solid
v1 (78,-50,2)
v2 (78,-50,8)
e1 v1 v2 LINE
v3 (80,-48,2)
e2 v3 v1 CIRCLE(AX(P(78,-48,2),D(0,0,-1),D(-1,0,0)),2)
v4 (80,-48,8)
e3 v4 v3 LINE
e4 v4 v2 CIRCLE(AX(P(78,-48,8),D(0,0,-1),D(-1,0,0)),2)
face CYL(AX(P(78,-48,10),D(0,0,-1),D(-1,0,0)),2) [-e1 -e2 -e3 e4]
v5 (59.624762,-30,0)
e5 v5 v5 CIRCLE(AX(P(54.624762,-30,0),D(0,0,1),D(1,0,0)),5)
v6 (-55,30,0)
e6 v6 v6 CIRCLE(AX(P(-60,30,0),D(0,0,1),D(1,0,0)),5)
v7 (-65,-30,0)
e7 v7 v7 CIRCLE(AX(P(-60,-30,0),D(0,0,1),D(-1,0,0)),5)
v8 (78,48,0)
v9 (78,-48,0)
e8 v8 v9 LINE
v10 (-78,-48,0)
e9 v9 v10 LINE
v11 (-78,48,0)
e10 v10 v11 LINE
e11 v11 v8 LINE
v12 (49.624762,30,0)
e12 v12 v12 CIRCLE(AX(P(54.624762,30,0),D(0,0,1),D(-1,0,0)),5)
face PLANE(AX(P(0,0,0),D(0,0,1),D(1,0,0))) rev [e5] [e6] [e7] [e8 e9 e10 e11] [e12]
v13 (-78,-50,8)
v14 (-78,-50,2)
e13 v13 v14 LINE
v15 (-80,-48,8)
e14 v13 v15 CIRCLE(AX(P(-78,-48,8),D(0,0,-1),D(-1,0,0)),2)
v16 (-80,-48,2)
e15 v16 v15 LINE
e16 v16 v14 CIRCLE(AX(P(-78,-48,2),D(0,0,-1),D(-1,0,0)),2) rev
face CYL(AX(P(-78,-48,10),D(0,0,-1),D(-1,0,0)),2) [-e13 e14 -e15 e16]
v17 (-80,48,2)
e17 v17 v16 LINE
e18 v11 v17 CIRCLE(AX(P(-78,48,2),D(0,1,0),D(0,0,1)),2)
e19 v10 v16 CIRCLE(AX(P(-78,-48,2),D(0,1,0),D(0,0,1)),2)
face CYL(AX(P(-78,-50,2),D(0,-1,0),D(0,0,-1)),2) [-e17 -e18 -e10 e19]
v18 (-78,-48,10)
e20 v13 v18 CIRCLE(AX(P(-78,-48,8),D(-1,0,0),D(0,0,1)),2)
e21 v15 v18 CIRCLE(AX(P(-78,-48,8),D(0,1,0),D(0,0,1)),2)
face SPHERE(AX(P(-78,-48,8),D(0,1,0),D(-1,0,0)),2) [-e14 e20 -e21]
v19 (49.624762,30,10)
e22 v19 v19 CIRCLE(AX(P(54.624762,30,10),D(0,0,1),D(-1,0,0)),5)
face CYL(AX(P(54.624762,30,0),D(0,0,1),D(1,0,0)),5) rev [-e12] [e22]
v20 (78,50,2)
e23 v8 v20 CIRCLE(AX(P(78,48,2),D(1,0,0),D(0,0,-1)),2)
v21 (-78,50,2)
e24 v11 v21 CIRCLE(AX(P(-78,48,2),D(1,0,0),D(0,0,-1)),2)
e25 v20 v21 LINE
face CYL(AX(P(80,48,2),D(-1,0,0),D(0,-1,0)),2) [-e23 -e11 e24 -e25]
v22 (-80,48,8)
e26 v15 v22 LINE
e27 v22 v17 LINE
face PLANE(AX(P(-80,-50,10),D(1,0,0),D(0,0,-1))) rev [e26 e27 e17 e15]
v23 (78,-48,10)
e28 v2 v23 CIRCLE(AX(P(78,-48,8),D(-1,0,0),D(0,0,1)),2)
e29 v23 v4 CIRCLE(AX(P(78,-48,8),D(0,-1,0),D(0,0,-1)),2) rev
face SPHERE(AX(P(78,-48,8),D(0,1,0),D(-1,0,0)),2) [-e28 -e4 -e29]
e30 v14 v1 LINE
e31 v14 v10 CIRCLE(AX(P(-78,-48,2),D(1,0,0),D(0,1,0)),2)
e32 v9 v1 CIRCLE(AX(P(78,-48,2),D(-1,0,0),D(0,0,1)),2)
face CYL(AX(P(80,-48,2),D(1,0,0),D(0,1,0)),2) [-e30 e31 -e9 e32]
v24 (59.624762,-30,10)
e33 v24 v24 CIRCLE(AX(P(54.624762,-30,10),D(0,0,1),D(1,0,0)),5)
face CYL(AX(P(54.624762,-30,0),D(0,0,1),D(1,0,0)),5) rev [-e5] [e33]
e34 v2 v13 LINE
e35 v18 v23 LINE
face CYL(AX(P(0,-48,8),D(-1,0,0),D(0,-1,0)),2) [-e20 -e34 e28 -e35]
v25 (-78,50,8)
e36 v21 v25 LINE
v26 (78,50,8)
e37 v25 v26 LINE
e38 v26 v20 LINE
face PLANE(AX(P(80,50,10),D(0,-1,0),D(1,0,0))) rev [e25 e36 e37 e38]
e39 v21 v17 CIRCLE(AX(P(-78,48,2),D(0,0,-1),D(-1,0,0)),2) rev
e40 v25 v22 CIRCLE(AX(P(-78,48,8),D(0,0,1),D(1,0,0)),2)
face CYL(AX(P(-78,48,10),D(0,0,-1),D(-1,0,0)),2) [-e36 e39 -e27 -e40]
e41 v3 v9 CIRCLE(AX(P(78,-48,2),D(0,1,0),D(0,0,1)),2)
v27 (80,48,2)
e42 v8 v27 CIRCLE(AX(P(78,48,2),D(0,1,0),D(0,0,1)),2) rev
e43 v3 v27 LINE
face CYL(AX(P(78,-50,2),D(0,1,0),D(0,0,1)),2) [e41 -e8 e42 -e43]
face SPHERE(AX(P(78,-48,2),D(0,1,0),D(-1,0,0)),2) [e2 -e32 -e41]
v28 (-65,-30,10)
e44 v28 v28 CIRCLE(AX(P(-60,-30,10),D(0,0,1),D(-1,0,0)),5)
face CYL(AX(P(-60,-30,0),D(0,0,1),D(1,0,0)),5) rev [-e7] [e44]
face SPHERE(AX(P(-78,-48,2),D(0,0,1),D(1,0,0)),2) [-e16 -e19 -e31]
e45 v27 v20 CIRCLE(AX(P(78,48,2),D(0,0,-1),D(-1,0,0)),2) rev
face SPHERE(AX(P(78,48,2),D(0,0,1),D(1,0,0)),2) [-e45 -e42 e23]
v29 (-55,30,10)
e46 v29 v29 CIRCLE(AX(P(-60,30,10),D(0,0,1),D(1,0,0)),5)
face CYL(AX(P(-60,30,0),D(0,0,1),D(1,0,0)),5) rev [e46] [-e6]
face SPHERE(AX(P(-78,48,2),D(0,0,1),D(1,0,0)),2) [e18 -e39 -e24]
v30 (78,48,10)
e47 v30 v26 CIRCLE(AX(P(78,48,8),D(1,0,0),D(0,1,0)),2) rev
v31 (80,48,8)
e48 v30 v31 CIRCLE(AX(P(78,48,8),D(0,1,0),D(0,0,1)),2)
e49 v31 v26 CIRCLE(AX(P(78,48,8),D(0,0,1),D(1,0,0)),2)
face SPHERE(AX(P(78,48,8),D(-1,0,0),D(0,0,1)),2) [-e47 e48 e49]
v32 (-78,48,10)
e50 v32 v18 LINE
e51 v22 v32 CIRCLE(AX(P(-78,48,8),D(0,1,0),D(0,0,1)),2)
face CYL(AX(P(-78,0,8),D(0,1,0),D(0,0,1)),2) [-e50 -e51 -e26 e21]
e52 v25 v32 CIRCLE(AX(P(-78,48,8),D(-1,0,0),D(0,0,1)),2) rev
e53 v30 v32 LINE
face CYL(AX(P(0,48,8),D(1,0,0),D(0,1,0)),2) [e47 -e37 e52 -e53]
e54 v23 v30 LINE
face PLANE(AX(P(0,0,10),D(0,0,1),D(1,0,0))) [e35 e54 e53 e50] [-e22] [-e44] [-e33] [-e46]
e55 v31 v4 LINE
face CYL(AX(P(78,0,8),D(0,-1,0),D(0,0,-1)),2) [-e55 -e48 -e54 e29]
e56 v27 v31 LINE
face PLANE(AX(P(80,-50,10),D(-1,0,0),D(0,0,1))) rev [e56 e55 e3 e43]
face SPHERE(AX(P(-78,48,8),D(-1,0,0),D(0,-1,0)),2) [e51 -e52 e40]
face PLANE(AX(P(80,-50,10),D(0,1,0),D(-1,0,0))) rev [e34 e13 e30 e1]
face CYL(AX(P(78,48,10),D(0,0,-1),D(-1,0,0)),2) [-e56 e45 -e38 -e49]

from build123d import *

# Parameters (mm, degrees)
SKETCH1_W           = 160
SKETCH1_H           = 100
BOSS_EXTRUDE2_DEPTH = 10
SKETCH2_R           = 5
CUT_EXTRUDE1_DEPTH  = 10
FILLET3_R           = 2
FILLET4_R           = 2
FILLET5_R           = 2
FILLET6_R           = 2


with BuildPart() as part:
    # Sketch1 → Boss-Extrude2 (new body)
    with BuildSketch(Plane.XY):
        Rectangle(SKETCH1_W, SKETCH1_H)
    extrude(amount=BOSS_EXTRUDE2_DEPTH)

    # Sketch2 → Cut-Extrude1 (cut)
    with BuildSketch(Plane.XY.offset(10)):
        with Locations((-60, 30)):
            Circle(SKETCH2_R)
        with Locations(Location((54.624761616, 30, 0), (0, 0, 180))):
            Circle(SKETCH2_R)
        with Locations((54.624761616, -30)):
            Circle(SKETCH2_R)
        with Locations(Location((-60, -30, 0), (0, 0, 180))):
            Circle(SKETCH2_R)
    extrude(amount=-CUT_EXTRUDE1_DEPTH, mode=Mode.SUBTRACT)

    # Fillet3
    fillet3_edges = [part.edges().sort_by_distance(p)[0] for p in [
        (0, 50, 10),
        (-80, 0, 10),
        (-80, 50, 5),
    ]]
    fillet(fillet3_edges, radius=FILLET3_R)

    # Fillet4
    fillet4_edges = [part.edges().sort_by_distance(p)[0] for p in [
        (80, -1, 10),
        (80, 50, 4),
        (80, 49.414213562, 9.414213562),
        (80, 0, 0),
    ]]
    fillet(fillet4_edges, radius=FILLET4_R)

    # Fillet5
    fillet5_edges = [part.edges().sort_by_distance(p)[0] for p in [
        (0, -50, 10),
        (-80, -50, 4),
        (-79.414213562, -50, 9.414213562),
        (80, -50, 5),
        (79.414213562, -50, 9.414213562),
        (79.414213562, -50, 0.585786438),
        (-1, -50, 0),
    ]]
    fillet(fillet5_edges, radius=FILLET5_R)

    # Fillet6
    # the kernel refuses this fillet: 2 mm, written as the material it takes off along each edge
    with BuildSketch(Plane(origin=(78, 48, 2), x_dir=(0, 1, 0), z_dir=(0, 0, -1))) as fillet6_piece_1_section:
        Polygon((0, 0), (FILLET6_R, 0), (FILLET6_R, FILLET6_R), (0, FILLET6_R), align=None)
    fillet6_piece_1 = extrude(amount=FILLET6_R, mode=Mode.PRIVATE)
    fillet6_piece_1 = fillet6_piece_1 - Plane(origin=(78, 48, 2), x_dir=(-0.7071067811865475, -0.7071067811865476, 0), z_dir=(0, 0, -1)) * Sphere(FILLET6_R, mode=Mode.PRIVATE)
    add(fillet6_piece_1, mode=Mode.SUBTRACT)
    with BuildSketch(Plane(origin=(-78, -48, 2), x_dir=(-1, 0, 0), z_dir=(0, 0, -1))) as fillet6_piece_2_section:
        Polygon((0, 0), (FILLET6_R, 0), (FILLET6_R, -FILLET6_R), (0, -FILLET6_R), align=None)
    fillet6_piece_2 = extrude(amount=FILLET6_R, mode=Mode.PRIVATE)
    fillet6_piece_2 = fillet6_piece_2 - Plane(origin=(-78, -48, 2), x_dir=(0.7071067811865475, 0.7071067811865475, 0), z_dir=(0, 0, -1)) * Sphere(FILLET6_R, mode=Mode.PRIVATE)
    add(fillet6_piece_2, mode=Mode.SUBTRACT)
    with BuildSketch(Plane(origin=(-80, -48, 0), x_dir=(1, 0, 0), z_dir=(0, 1, 0))) as fillet6_piece_3:
        with BuildLine():
            CenterArc((FILLET6_R, -FILLET6_R), FILLET6_R, 90, 90)
            Line((0, -FILLET6_R), (0, 0))
            Line((0, 0), (FILLET6_R, 0))
        make_face()
    extrude(amount=96, mode=Mode.SUBTRACT)
    with BuildSketch(Plane(origin=(-78, 48, 0), x_dir=(-1, 0, 0), z_dir=(0, -1, 0))) as fillet6_piece_4:
        with BuildLine():
            CenterArc((2 - FILLET6_R, -FILLET6_R), FILLET6_R, 0, 90)
            Line((2, -FILLET6_R), (2, 0))
            Line((2, 0), (2 - FILLET6_R, 0))
        make_face()
    revolve(axis=Axis((-78, 48, 0), (0, 0, -1)), revolution_arc=90, mode=Mode.SUBTRACT)
    with BuildSketch(Plane(origin=(-78, 50, 0), x_dir=(0, -1, 0), z_dir=(1, 0, 0))) as fillet6_piece_5:
        with BuildLine():
            CenterArc((FILLET6_R, -FILLET6_R), FILLET6_R, 90, 90)
            Line((0, -FILLET6_R), (0, 0))
            Line((0, 0), (FILLET6_R, 0))
        make_face()
    extrude(amount=156, mode=Mode.SUBTRACT)


solid = part.part
